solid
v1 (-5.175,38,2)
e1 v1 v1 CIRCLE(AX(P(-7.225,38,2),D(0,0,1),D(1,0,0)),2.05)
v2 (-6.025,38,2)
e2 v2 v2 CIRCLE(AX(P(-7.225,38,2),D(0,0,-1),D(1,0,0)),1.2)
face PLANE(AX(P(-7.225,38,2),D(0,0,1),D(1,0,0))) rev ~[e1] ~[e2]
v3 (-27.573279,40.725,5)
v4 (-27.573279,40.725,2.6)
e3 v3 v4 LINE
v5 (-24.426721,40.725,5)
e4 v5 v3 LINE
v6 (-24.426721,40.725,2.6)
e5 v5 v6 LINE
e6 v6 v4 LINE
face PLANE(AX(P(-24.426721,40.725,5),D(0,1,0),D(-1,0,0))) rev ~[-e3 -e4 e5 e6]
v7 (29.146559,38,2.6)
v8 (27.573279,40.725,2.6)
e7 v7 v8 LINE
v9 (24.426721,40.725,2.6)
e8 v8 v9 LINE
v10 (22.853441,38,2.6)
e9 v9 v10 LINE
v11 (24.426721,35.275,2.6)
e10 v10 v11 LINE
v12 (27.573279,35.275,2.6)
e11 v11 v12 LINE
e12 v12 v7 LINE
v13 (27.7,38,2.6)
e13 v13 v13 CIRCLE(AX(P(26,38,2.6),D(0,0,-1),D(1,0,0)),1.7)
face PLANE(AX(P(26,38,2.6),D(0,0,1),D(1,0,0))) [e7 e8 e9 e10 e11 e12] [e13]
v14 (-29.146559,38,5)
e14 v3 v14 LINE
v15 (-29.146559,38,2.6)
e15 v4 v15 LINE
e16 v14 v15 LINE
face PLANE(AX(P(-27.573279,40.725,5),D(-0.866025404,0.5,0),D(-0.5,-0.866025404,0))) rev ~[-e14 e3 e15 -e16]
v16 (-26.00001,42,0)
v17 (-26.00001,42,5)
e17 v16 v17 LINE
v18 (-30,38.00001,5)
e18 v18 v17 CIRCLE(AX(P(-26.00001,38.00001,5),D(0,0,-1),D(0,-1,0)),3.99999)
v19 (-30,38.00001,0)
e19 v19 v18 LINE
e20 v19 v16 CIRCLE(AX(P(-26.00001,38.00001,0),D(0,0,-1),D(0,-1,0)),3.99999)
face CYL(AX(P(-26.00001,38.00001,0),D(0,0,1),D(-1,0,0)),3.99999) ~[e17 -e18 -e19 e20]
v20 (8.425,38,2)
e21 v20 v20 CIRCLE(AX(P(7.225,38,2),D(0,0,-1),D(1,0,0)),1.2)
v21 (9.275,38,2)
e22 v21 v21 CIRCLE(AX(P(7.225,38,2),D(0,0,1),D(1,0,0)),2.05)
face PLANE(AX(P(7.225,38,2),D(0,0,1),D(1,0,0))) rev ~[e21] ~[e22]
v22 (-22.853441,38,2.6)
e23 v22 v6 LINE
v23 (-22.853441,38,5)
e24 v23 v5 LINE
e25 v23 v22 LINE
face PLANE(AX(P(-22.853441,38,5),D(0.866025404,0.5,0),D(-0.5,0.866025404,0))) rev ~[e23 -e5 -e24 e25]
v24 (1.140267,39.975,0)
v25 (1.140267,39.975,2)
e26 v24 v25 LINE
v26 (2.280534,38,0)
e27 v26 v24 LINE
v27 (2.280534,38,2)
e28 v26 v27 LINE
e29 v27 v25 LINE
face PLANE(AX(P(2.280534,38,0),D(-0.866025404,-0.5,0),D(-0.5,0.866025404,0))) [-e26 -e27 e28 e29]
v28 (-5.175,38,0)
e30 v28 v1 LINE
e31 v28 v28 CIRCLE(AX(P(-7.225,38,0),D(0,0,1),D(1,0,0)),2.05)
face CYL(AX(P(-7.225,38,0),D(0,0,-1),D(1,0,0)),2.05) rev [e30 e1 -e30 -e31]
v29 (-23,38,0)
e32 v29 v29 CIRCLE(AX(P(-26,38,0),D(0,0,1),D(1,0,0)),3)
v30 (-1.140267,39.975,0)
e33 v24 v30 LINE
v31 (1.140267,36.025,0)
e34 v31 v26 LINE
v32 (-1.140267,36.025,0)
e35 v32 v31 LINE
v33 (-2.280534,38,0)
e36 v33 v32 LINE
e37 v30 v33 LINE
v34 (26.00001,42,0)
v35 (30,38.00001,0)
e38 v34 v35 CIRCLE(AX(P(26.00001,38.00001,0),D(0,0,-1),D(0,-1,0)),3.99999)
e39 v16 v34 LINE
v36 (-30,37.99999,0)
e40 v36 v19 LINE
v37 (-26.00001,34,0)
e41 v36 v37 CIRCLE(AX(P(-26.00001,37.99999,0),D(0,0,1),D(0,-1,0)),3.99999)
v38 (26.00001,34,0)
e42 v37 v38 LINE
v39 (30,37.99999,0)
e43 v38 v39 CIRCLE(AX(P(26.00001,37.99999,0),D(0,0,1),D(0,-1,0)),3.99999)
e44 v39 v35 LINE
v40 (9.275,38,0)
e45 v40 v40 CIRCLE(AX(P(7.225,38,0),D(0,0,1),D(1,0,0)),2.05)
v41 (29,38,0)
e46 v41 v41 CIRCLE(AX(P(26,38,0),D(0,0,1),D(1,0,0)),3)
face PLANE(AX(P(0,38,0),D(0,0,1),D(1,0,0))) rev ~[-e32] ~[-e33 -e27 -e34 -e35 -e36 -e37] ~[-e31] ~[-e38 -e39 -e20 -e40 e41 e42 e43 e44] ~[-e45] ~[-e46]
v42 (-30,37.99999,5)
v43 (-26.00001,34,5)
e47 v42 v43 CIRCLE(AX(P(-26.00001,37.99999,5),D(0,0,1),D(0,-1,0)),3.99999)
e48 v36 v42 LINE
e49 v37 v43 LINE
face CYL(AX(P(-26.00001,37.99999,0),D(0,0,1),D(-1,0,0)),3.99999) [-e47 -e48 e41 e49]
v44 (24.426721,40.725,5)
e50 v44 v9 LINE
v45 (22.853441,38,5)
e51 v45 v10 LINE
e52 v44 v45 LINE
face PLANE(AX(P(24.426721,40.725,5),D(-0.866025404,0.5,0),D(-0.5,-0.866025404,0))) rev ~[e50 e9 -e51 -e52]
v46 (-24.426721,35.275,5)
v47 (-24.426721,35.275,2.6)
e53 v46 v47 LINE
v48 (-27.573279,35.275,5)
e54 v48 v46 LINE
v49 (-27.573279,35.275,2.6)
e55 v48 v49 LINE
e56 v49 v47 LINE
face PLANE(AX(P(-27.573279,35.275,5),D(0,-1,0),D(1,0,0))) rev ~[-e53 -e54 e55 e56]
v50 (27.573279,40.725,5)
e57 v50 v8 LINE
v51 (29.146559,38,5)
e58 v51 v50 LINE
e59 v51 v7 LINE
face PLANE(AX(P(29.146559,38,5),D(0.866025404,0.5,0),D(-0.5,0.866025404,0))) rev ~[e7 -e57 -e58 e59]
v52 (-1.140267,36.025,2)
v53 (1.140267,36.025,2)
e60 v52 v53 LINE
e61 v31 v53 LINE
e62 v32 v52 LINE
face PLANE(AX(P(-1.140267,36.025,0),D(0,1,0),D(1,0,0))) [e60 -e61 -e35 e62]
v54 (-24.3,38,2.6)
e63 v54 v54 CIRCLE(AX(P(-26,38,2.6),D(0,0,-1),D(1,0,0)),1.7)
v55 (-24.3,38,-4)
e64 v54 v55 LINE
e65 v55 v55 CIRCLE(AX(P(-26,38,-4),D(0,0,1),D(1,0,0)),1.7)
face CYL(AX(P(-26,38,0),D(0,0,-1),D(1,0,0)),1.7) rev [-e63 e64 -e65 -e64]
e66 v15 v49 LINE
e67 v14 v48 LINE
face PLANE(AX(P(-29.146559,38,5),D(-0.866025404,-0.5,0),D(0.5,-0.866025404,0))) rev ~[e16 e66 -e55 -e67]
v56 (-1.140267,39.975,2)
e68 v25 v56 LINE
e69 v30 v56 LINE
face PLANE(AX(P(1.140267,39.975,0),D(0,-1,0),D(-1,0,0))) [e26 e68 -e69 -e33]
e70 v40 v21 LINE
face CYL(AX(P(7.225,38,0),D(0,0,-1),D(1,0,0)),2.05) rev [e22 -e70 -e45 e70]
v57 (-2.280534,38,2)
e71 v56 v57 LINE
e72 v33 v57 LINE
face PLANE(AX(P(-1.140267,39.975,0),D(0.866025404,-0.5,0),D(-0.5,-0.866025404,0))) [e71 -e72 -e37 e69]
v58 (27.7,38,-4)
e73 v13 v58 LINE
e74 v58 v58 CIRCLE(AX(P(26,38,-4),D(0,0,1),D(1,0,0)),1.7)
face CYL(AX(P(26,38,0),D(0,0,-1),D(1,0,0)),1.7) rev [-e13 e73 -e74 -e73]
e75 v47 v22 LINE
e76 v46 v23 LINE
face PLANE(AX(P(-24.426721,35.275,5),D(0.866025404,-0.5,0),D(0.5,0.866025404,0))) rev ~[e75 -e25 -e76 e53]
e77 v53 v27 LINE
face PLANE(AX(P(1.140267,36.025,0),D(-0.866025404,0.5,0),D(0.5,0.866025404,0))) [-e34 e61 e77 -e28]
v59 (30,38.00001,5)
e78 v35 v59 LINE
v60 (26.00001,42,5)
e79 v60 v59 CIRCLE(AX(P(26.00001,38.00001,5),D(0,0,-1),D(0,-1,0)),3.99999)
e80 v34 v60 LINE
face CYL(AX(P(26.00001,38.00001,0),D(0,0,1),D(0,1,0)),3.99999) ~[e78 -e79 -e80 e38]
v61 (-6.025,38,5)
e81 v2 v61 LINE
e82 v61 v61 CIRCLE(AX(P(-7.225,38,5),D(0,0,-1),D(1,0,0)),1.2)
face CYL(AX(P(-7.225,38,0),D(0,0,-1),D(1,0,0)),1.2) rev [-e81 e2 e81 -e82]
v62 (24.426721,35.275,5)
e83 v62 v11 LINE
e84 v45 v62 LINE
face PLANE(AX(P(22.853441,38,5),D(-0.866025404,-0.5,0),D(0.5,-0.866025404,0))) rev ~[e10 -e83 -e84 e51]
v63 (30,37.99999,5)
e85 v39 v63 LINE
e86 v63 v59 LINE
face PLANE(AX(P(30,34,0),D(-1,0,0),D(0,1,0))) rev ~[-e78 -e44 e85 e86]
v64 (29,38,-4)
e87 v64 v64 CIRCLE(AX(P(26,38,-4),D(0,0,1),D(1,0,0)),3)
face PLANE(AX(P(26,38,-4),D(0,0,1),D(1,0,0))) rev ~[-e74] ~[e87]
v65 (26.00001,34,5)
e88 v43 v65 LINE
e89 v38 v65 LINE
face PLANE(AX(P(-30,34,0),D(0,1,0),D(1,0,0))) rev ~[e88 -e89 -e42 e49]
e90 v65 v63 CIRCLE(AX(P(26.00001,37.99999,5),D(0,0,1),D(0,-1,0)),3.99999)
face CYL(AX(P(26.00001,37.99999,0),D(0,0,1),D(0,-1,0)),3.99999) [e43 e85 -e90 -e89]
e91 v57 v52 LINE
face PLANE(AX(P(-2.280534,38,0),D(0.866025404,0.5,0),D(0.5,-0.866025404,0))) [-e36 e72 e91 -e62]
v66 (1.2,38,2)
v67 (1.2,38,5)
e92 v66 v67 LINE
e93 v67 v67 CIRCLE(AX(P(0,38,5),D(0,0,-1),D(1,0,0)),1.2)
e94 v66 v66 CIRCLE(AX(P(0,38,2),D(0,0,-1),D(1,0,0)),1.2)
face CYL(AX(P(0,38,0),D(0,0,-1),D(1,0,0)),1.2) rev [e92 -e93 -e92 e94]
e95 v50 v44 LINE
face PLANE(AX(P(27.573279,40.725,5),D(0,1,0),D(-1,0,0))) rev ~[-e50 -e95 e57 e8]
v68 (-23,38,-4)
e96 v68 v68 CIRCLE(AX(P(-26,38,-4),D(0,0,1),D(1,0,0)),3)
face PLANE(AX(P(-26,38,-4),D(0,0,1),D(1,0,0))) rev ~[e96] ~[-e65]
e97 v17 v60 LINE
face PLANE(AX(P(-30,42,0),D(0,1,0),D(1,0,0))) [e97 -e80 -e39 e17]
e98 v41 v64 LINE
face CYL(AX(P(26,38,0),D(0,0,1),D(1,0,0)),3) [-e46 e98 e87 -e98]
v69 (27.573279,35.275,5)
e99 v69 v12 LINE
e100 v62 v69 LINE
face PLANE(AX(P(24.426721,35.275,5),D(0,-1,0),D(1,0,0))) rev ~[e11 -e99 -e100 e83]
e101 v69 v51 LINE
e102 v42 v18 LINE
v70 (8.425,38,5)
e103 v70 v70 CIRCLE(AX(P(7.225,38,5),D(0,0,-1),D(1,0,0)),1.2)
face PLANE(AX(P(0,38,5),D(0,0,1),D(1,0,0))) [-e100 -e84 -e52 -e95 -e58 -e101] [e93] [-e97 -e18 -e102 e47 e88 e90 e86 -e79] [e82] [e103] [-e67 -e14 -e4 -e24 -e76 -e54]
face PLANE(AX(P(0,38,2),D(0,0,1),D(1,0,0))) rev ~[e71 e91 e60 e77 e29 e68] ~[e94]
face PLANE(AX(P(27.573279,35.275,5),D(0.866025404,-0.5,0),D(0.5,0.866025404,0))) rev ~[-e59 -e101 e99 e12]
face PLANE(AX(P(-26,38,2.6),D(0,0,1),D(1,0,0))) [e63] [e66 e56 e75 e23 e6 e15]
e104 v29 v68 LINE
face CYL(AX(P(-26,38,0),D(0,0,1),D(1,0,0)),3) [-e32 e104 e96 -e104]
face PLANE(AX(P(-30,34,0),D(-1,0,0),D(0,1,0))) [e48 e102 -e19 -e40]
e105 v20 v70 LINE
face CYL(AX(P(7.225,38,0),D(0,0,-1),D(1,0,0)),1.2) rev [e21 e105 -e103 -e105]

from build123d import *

# Parameters (mm, degrees)
F2_W      = 60
F2_H      = 8
F2_R      = 3
F5_DEPTH  = 5
F1_R      = 3
F1_R_2    = 1.7
F6_DEPTH  = 4
F0_R      = 1.7
F7_DEPTH  = 12.5
F3_R      = 2.05
F8_DEPTH  = 2
F9_DEPTH  = 2
F11_DEPTH = 2.4
F12_R     = 3.99999
F4_R      = 1.2
F13_DEPTH = 5.001


# Not quite as in the source:
# - a fillet or chamfer is up to 0.001 mm smaller than in the source, because OpenCascade refuses the exact size


with BuildPart() as f5:
    # F2 (on face) → F5 (new body)
    with BuildSketch(Plane.XY):
        with Locations((0, 38)):
            Rectangle(F2_W, F2_H)
        with Locations((-26, 38)):
            Circle(F2_R, mode=Mode.SUBTRACT)
        Polygon((1.1402667816, 36.025), (0, 36.025), (-1.1402667816, 36.025), (-2.2805335633, 38), (-1.1402667816, 39.975), (0, 39.975), (1.1402667816, 39.975), (2.2805335633, 38), align=None, mode=Mode.SUBTRACT)
        with Locations((26, 38)):
            Circle(F2_R, mode=Mode.SUBTRACT)
        Polygon((-1.1402667816, 36.025), (0, 36.025), (1.1402667816, 36.025), (2.2805335633, 38), (1.1402667816, 39.975), (0, 39.975), (-1.1402667816, 39.975), (-2.2805335633, 38), align=None)
        with Locations((-26, 38)):
            Circle(F2_R)
        with Locations((26, 38)):
            Circle(F2_R)
    extrude(amount=F5_DEPTH)

    # F1 (on Top) → F6 (join)
    with BuildSketch(Plane.XY):
        with Locations((-26, 38)):
            Circle(F1_R)
        with Locations((-26, 38)):
            Circle(F1_R_2, mode=Mode.SUBTRACT)
        with Locations((26, 38)):
            Circle(F1_R)
        with Locations((26, 38)):
            Circle(F1_R_2, mode=Mode.SUBTRACT)
    extrude(amount=-F6_DEPTH)

    # F0 (on Top) → F7 (cut, symmetric)
    with BuildSketch(Plane.XY):
        with Locations((-26, 38)):
            Circle(F0_R)
        with Locations((26, 38)):
            Circle(F0_R)
        with Locations((-26, -38)):
            Circle(F0_R)
        with Locations((26, -38)):
            Circle(F0_R)
    extrude(amount=F7_DEPTH, both=True, mode=Mode.SUBTRACT)

    # F3 (on face) → F8 (cut)
    with BuildSketch(Plane.XY):
        with Locations((-7.225, 38)):
            Circle(F3_R)
        with Locations((7.225, 38)):
            Circle(F3_R)
    extrude(amount=F8_DEPTH, mode=Mode.SUBTRACT)

    # F2 (on face) → F9 (cut)
    with BuildSketch(Plane.XY):
        Polygon((-1.1402667816, 36.025), (0, 36.025), (1.1402667816, 36.025), (2.2805335633, 38), (1.1402667816, 39.975), (0, 39.975), (-1.1402667816, 39.975), (-2.2805335633, 38), align=None)
    extrude(amount=F9_DEPTH, mode=Mode.SUBTRACT)

    # F10 (on face) → F11 (cut)
    with BuildSketch(Plane.XY.offset(5)):
        Polygon((-27.5732794835, 35.275), (-26, 35.275), (-24.4267205165, 35.275), (-22.8534410329, 38), (-24.4267205165, 40.725), (-26, 40.725), (-27.5732794835, 40.725), (-29.1465589671, 38), align=None)
        Polygon((22.8534410329, 38), (24.4267205165, 35.275), (26, 35.275), (27.5732794835, 35.275), (29.1465589671, 38), (27.5732794835, 40.725), (26, 40.725), (24.4267205165, 40.725), align=None)
    extrude(amount=-F11_DEPTH, mode=Mode.SUBTRACT)

    # F12 (radius 4 in the source; OpenCascade refuses exactly that, so slightly less here)
    f12_edges = [f5.edges().sort_by_distance(p)[0] for p in [
        (-30, 42, 2.5),
        (-30, 34, 2.5),
        (30, 42, 2.5),
        (30, 34, 2.5),
    ]]
    fillet(f12_edges, radius=F12_R)

    # F4 (on face) → F13 (cut, through all)
    with BuildSketch(Plane.XY):
        with Locations((-7.225, 38)):
            Circle(F4_R)
        with Locations((0, 38)):
            Circle(F4_R)
        with Locations((7.225, 38)):
            Circle(F4_R)
    extrude(amount=F13_DEPTH, mode=Mode.SUBTRACT)


solid = f5.part
